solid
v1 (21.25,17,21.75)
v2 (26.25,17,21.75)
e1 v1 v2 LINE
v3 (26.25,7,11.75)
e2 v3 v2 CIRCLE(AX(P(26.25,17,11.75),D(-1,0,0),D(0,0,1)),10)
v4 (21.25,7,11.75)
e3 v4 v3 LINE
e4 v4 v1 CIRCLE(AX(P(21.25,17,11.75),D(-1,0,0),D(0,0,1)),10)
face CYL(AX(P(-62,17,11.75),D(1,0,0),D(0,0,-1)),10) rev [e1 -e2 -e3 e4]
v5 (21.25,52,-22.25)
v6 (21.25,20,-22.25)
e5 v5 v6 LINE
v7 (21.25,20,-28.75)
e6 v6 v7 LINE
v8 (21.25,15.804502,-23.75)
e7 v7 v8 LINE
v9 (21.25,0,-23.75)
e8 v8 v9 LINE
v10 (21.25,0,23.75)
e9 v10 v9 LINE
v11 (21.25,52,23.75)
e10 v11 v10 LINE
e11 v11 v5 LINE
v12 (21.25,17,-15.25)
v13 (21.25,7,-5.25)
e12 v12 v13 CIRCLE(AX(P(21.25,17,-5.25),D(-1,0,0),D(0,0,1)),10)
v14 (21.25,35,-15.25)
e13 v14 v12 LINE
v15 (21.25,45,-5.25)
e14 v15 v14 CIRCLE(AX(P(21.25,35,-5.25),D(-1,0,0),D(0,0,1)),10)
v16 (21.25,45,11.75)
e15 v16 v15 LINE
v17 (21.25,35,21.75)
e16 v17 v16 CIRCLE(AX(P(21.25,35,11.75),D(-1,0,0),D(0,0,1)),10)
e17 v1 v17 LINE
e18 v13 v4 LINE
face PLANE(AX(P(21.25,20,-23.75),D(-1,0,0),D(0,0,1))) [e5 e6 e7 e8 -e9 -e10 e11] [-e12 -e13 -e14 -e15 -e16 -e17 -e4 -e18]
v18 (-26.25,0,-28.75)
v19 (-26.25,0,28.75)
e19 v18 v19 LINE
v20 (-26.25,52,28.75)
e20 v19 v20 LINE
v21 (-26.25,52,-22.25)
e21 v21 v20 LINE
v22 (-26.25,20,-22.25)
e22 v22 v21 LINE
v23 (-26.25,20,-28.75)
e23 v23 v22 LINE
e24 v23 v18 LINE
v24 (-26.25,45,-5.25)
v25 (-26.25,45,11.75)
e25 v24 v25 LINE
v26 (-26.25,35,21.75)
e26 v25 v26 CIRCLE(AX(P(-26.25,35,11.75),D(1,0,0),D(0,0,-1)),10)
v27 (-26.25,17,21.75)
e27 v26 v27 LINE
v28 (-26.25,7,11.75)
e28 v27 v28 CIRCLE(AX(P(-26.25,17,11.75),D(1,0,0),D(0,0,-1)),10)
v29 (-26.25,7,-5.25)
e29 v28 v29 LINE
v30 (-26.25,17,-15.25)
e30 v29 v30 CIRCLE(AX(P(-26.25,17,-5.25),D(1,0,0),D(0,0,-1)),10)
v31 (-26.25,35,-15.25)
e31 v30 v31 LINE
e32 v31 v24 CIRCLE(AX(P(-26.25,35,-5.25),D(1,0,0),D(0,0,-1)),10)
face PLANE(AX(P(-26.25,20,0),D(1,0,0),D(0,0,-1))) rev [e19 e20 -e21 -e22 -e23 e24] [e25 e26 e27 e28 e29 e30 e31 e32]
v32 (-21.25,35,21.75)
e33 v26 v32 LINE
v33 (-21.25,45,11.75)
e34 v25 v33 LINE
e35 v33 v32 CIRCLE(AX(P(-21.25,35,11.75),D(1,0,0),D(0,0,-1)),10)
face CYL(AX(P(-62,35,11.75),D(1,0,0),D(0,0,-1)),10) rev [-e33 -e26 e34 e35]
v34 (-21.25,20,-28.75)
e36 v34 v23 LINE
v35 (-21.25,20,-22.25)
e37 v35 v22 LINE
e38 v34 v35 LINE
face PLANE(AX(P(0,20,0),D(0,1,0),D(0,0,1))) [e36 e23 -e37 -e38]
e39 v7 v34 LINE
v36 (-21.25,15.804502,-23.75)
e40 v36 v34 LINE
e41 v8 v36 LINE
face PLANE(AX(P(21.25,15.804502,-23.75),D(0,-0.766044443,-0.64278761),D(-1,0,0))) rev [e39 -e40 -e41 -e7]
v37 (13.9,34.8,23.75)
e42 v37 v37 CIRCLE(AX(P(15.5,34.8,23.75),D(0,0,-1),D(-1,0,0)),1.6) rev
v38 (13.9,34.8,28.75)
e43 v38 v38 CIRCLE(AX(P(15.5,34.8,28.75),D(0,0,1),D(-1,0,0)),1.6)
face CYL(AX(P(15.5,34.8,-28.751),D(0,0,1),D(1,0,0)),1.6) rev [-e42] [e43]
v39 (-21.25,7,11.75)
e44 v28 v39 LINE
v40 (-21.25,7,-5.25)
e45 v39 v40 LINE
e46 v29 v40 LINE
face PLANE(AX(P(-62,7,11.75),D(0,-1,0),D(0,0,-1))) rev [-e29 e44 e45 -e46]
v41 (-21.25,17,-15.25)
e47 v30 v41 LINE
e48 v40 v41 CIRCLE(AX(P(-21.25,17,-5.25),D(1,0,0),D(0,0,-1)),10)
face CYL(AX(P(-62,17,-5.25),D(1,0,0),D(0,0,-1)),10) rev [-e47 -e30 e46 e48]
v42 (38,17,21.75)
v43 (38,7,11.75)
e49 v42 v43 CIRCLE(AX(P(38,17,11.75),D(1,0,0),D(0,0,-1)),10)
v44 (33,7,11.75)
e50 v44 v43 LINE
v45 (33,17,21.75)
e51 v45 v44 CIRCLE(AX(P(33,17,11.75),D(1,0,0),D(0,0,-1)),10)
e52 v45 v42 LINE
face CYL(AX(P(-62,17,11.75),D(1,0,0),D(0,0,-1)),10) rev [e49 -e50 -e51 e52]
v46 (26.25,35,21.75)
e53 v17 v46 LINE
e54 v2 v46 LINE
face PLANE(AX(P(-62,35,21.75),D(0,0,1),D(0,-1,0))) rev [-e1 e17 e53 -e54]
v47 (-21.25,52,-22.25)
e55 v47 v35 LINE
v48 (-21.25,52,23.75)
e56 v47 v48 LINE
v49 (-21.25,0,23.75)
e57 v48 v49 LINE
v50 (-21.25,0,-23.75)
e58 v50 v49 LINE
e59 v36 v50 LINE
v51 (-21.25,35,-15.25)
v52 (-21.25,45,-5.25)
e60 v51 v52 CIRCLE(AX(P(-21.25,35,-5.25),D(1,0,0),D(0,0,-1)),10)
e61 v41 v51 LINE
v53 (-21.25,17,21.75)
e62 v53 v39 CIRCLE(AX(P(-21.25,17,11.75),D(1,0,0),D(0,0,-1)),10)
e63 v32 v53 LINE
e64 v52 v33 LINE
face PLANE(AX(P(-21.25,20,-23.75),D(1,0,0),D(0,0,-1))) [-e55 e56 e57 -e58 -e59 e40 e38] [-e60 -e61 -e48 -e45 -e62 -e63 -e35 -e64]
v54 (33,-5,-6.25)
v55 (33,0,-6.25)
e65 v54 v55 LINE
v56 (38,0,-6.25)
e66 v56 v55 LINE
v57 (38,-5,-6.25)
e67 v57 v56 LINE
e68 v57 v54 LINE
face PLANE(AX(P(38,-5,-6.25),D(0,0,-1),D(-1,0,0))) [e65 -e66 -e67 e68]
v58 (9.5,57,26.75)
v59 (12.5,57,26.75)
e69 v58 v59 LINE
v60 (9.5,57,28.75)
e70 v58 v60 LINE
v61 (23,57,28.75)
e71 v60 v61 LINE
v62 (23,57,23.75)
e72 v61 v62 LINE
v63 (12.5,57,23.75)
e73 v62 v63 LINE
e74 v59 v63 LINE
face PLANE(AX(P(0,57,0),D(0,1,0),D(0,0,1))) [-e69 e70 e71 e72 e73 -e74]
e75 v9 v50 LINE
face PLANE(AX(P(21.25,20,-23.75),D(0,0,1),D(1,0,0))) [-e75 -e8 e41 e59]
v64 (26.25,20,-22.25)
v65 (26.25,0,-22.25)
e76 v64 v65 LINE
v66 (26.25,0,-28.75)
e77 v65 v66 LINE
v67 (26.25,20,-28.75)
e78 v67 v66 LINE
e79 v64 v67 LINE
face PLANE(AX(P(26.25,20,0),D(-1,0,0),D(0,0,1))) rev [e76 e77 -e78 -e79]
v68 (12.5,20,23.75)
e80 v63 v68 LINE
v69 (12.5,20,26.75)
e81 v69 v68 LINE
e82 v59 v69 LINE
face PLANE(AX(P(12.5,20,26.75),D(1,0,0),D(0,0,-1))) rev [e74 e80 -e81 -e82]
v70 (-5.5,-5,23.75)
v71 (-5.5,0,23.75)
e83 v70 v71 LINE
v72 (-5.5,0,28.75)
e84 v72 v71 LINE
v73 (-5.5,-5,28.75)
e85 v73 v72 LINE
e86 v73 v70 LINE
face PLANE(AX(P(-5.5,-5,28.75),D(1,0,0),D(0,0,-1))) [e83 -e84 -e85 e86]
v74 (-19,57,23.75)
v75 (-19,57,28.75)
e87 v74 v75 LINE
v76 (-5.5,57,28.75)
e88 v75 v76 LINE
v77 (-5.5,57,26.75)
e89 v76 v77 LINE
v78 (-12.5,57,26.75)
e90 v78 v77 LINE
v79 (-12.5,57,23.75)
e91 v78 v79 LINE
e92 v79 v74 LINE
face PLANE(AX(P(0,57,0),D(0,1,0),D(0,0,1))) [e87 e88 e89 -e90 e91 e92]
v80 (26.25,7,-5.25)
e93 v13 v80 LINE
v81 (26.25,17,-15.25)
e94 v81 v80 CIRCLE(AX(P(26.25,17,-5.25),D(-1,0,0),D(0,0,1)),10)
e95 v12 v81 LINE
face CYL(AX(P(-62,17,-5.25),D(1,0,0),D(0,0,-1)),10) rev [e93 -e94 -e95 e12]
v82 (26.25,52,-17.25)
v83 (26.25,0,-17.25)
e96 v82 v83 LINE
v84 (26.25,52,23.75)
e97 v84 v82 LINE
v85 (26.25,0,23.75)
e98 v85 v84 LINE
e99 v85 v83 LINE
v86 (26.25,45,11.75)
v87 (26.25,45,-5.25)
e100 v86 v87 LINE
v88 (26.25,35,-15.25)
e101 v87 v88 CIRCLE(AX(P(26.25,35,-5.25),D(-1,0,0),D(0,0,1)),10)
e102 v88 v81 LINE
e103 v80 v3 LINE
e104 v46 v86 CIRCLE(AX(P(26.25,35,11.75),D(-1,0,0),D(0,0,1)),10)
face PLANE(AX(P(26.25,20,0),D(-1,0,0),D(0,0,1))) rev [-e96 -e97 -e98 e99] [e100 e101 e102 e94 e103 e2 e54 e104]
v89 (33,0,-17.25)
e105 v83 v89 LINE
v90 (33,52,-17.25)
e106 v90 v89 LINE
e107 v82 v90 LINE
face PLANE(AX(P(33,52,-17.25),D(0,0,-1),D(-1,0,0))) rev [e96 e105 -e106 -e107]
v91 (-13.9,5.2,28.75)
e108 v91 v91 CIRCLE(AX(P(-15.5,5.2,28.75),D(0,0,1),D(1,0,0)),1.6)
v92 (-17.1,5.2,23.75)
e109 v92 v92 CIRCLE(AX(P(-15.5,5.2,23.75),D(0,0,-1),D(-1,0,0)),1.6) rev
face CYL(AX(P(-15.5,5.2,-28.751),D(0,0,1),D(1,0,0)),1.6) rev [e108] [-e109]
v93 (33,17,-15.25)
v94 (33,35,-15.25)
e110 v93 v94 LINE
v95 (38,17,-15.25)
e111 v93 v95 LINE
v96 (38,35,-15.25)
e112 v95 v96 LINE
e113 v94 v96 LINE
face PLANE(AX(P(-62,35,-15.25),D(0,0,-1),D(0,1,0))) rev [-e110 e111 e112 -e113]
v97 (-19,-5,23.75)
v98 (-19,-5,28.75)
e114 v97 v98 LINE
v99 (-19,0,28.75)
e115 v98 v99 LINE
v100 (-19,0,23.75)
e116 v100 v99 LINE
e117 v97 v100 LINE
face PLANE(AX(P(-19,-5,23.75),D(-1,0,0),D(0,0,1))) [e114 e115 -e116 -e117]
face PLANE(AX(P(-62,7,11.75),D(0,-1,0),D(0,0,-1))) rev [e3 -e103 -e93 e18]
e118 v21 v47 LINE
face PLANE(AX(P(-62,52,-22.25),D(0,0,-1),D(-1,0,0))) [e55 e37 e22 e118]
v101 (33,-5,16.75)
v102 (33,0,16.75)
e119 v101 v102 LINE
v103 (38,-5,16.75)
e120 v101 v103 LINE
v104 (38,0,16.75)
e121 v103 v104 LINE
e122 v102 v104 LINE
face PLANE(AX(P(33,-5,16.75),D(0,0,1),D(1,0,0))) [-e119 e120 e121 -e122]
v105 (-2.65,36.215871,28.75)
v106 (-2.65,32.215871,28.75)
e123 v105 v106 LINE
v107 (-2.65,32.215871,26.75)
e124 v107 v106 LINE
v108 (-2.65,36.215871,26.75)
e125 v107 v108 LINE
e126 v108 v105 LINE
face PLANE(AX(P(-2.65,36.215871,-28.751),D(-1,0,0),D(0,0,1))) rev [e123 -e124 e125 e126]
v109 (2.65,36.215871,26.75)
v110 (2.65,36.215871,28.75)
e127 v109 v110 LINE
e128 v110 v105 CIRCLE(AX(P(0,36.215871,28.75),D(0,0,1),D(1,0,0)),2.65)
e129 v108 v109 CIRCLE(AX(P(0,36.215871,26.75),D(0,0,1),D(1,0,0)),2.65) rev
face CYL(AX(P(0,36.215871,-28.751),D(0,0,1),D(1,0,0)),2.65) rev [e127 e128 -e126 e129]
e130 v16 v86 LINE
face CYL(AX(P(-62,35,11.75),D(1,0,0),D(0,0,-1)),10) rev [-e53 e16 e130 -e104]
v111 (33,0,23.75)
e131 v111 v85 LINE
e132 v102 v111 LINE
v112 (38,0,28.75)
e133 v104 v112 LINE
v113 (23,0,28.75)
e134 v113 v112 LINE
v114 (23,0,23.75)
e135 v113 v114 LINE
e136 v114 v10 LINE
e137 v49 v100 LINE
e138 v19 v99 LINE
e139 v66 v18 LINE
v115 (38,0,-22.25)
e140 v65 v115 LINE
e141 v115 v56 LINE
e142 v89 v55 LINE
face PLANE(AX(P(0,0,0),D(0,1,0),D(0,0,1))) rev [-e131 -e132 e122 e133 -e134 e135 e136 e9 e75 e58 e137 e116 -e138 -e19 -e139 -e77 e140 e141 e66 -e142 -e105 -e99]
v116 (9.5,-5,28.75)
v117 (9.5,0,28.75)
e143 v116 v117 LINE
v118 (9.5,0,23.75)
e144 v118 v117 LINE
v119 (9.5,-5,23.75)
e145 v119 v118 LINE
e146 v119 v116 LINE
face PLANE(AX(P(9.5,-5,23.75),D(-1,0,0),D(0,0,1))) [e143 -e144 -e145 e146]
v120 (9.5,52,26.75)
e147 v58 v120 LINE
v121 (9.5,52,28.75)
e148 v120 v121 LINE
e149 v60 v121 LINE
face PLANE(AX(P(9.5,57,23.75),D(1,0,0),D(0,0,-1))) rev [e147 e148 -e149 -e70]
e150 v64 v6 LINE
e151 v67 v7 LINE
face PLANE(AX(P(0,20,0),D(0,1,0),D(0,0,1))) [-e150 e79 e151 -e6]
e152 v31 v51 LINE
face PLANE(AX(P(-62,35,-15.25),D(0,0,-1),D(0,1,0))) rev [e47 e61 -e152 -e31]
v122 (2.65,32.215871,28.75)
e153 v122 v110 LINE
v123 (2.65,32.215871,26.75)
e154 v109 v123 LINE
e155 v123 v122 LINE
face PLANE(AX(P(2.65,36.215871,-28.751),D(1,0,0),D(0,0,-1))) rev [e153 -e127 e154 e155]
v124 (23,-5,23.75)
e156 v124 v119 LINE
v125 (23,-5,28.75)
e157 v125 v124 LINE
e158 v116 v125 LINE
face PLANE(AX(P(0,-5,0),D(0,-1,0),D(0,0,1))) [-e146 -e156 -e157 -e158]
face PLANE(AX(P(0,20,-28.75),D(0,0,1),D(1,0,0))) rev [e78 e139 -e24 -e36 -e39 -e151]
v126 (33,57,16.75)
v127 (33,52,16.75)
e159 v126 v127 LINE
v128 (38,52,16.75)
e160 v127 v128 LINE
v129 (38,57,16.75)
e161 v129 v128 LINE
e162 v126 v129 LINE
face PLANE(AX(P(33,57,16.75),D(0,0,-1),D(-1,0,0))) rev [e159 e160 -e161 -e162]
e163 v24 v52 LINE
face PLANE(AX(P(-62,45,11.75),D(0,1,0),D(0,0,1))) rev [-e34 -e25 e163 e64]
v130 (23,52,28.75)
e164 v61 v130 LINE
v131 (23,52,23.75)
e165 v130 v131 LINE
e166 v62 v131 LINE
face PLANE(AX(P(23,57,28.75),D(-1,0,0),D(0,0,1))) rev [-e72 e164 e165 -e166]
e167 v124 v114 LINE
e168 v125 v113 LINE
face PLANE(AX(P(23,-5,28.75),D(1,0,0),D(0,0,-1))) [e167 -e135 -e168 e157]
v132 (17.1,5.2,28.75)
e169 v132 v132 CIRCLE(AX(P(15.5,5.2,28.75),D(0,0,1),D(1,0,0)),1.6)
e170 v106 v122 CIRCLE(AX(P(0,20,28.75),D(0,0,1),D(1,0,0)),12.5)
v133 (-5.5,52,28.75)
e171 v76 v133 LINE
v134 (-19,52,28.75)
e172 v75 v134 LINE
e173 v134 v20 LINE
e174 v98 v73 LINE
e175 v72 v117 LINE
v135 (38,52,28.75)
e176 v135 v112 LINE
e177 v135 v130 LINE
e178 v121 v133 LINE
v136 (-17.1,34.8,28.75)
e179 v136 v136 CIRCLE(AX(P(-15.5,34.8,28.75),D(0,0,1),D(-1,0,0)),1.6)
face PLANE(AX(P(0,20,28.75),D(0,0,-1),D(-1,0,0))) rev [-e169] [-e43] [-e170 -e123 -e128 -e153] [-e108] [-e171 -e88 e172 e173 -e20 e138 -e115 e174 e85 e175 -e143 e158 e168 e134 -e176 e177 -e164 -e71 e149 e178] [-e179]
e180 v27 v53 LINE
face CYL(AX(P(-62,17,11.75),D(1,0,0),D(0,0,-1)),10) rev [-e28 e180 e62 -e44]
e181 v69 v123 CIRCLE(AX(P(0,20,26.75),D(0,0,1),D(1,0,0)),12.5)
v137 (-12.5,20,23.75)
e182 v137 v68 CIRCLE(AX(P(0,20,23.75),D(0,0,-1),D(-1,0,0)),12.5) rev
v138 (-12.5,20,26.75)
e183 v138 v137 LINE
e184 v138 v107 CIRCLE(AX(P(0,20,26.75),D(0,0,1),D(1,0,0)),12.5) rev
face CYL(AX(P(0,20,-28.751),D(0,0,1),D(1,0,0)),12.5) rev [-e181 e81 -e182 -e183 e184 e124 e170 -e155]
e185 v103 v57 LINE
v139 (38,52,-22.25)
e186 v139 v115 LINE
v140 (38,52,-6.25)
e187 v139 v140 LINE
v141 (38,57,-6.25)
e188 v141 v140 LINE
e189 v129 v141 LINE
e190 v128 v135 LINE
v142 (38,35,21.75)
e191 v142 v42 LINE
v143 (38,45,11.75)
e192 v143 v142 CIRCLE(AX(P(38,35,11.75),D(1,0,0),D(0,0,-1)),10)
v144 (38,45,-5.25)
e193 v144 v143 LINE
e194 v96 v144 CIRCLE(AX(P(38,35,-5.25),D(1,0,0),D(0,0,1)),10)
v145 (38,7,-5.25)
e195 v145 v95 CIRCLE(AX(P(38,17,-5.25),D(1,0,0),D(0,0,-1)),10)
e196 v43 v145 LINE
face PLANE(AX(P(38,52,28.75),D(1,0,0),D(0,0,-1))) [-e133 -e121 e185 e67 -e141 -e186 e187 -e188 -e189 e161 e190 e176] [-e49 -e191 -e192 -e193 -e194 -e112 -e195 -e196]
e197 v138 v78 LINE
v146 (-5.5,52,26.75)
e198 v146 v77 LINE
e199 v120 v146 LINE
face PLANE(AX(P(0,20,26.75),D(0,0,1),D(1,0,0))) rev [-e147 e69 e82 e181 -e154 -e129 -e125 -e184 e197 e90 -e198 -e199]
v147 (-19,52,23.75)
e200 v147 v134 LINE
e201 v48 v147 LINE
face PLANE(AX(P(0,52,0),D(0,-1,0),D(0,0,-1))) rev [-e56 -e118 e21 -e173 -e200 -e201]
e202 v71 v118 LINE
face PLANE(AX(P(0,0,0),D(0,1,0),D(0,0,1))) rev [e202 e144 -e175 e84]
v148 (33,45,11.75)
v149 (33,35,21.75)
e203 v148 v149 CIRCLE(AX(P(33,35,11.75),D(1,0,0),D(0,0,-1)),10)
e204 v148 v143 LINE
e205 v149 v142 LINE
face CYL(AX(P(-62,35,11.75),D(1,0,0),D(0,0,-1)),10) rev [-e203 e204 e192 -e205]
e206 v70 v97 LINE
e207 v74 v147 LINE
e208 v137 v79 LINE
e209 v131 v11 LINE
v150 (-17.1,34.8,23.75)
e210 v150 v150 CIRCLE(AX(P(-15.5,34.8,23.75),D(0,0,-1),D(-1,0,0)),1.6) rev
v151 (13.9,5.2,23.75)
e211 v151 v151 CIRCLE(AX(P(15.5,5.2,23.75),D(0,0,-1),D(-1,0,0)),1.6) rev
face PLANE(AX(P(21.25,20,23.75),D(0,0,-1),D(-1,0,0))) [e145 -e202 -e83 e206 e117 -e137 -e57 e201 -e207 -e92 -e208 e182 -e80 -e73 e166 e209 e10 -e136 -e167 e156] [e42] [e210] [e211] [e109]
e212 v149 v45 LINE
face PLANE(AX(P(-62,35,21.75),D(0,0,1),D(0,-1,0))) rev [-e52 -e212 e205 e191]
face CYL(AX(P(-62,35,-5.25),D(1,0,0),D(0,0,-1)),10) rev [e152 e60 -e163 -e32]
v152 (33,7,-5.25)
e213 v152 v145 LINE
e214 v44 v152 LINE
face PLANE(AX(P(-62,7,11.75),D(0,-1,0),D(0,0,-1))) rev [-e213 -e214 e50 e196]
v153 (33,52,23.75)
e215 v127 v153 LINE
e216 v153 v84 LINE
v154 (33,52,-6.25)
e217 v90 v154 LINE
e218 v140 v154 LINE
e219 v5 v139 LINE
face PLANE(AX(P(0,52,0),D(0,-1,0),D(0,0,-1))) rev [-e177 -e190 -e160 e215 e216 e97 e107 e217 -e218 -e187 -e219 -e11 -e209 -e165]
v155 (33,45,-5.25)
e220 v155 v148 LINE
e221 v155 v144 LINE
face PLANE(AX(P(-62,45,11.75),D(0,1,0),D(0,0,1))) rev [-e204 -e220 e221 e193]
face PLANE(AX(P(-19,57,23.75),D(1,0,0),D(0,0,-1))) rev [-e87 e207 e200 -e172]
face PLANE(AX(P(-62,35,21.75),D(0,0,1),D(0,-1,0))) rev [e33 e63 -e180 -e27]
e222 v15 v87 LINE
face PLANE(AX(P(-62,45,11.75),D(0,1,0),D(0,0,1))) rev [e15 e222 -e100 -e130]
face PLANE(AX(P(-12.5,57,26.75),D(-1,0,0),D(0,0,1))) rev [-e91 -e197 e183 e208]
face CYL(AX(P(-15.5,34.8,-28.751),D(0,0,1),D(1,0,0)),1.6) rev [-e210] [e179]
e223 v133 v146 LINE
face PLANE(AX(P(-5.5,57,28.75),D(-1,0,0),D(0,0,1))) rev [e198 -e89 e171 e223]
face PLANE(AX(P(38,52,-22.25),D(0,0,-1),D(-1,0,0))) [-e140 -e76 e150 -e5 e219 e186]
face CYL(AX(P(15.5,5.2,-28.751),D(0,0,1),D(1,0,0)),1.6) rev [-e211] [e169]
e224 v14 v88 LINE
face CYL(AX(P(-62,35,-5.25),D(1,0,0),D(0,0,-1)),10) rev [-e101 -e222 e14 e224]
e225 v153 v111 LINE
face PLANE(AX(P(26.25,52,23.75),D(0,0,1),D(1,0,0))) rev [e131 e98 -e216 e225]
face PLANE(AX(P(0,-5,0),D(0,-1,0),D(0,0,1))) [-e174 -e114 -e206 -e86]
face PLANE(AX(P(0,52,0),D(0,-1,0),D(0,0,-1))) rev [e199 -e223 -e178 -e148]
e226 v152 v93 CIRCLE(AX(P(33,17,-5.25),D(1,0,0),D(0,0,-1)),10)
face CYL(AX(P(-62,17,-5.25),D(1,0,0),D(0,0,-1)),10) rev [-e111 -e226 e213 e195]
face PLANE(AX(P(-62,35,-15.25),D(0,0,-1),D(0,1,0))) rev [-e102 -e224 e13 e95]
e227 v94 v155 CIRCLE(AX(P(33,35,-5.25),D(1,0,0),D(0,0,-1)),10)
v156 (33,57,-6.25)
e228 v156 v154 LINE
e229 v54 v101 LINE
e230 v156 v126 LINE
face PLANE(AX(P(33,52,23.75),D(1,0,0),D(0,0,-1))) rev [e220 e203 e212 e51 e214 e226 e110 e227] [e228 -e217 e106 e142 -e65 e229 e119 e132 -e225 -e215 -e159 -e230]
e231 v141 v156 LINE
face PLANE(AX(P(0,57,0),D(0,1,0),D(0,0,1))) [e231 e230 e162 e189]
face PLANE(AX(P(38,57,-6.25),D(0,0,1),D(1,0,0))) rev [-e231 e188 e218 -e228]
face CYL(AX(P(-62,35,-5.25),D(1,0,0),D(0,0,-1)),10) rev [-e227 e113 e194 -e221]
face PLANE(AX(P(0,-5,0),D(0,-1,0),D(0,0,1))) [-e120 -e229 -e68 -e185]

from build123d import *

# Parameters (mm, degrees)
ESQUISSE1_W                  = 52.5
ESQUISSE1_H                  = 57.5
ESQUISSE1_W_2                = 42.5
ESQUISSE1_H_2                = 47.5
EXTRU_MINCE1_DEPTH           = 20
ESQUISSE3_W                  = 6.75
ESQUISSE3_H                  = 41
ESQUISSE3_W_2                = 30.75
BOSS_EXTRU_1_DEPTH           = 52
ESQUISSE6_W                  = 5
ESQUISSE6_H                  = 23
ESQUISSE6_W_2                = 13.5
ESQUISSE6_H_2                = 5
BOSS_EXTRU_3_DEPTH           = 5
ENL_V_MAT_EXTRU_1_REACH      = 103.977
ESQUISSE2_R                  = 1.6
ENL_V_START                  = -3
ENL_V_MAT_EXTRU_2_DEPTH      = 3
ENL_V_MAT_EXTRU_3_DEPTH      = 119.640475808
ENL_V_MAT_EXTRU_4_DEPTH      = 99.458112921
ENL_V_MAT_EXTRU_5_DEPTH      = 89.991923791
ENL_V_MAT_EXTRU_5_DEPTH_BACK = 89.991923791
ESQUISSE10_W                 = 35.75
ESQUISSE10_H                 = 51
CHANFREIN1_SIZE2             = 4.195498156
CHANFREIN1_SIZE              = 5


with BuildPart() as part:
    # Esquisse1 → Extru.-Mince1 (new body)
    with BuildSketch(Plane(origin=(0, 0, 0), x_dir=(1, 0, 0), z_dir=(0, 1, 0))):
        Rectangle(ESQUISSE1_W, ESQUISSE1_H)
        Rectangle(ESQUISSE1_W_2, ESQUISSE1_H_2, mode=Mode.SUBTRACT)
    extrude(amount=EXTRU_MINCE1_DEPTH)

    # Esquisse3 → Boss.-Extru.1 (add)
    with BuildSketch(Plane.XZ):
        Polygon((26.25, 28.75), (38, 28.75), (38, -22.25), (21.25, -22.25), (21.25, 23.75), (-21.25, 23.75), (-21.25, -22.25), (-62, -22.25), (-62, 28.75), (-26.25, 28.75), (0, 28.75), align=None)
        with Locations((29.625, 3.25)):
            Rectangle(ESQUISSE3_W, ESQUISSE3_H, mode=Mode.SUBTRACT)
        with Locations((-41.625, 3.25)):
            Rectangle(ESQUISSE3_W_2, ESQUISSE3_H, mode=Mode.SUBTRACT)
    extrude(amount=-BOSS_EXTRU_1_DEPTH)

    # Esquisse6 → Boss.-Extru.3 (add)
    with BuildSketch(Plane(origin=(0, 52, 0), x_dir=(1, 0, 0), z_dir=(0, 1, 0))):
        with Locations((35.5, -5.25)):
            Rectangle(ESQUISSE6_W, ESQUISSE6_H)
        with Locations((16.25, -26.25)):
            Rectangle(ESQUISSE6_W_2, ESQUISSE6_H_2)
        with Locations((-12.25, -26.25)):
            Rectangle(ESQUISSE6_W_2, ESQUISSE6_H_2)
        with Locations((-40.75, -26.25)):
            Rectangle(ESQUISSE6_W_2, ESQUISSE6_H_2)
        with Locations((-40.75, 19.75)):
            Rectangle(ESQUISSE6_W_2, ESQUISSE6_H_2)
        with Locations((-59.5, -5.25)):
            Rectangle(ESQUISSE6_W, ESQUISSE6_H)
    boss_extru_3 = extrude(amount=BOSS_EXTRU_3_DEPTH)

    # Esquisse2 → Enlèv. mat.-Extru.1 (cut, up to next)
    with BuildSketch(Plane.XY.offset(28.75), mode=Mode.PRIVATE) as enl_v_mat_extru_1_sk1:
        with Locations((-15.5, 5.2)):
            Circle(ESQUISSE2_R)
    enl_v_mat_extru_1_tool1 = extrude(enl_v_mat_extru_1_sk1.sketch, amount=-ENL_V_MAT_EXTRU_1_REACH, mode=Mode.PRIVATE) & part.part
    # Esquisse2 → Enlèv. mat.-Extru.1 (cut, up to next)
    with BuildSketch(Plane.XY.offset(28.75), mode=Mode.PRIVATE) as enl_v_mat_extru_1_sk2:
        with Locations((15.5, 5.2)):
            Circle(ESQUISSE2_R)
    enl_v_mat_extru_1_tool2 = extrude(enl_v_mat_extru_1_sk2.sketch, amount=-ENL_V_MAT_EXTRU_1_REACH, mode=Mode.PRIVATE) & part.part
    # Esquisse2 → Enlèv. mat.-Extru.1 (cut, up to next)
    with BuildSketch(Plane.XY.offset(28.75), mode=Mode.PRIVATE) as enl_v_mat_extru_1_sk3:
        with Locations(Location((15.5, 34.8, 0), (0, 0, 180))):
            Circle(ESQUISSE2_R)
    enl_v_mat_extru_1_tool3 = extrude(enl_v_mat_extru_1_sk3.sketch, amount=-ENL_V_MAT_EXTRU_1_REACH, mode=Mode.PRIVATE) & part.part
    # Esquisse2 → Enlèv. mat.-Extru.1 (cut, up to next)
    with BuildSketch(Plane.XY.offset(28.75), mode=Mode.PRIVATE) as enl_v_mat_extru_1_sk4:
        with Locations(Location((-15.5, 34.8, 0), (0, 0, 180))):
            Circle(ESQUISSE2_R)
    enl_v_mat_extru_1_tool4 = extrude(enl_v_mat_extru_1_sk4.sketch, amount=-ENL_V_MAT_EXTRU_1_REACH, mode=Mode.PRIVATE) & part.part
    # Esquisse2 → Enlèv. mat.-Extru.1 (cut, up to next)
    with BuildSketch(Plane.XY.offset(28.75), mode=Mode.PRIVATE) as enl_v_mat_extru_1_sk5:
        with BuildLine():
            Line((2.65, 36.215870824), (2.65, 32.215870824))
            ThreePointArc((2.65, 32.215870824), (0, 7.5), (-2.65, 32.215870824))
            Line((-2.65, 32.215870824), (-2.65, 36.215870824))
            ThreePointArc((-2.65, 36.215870824), (0, 38.865870824), (2.65, 36.215870824))
        make_face()
    enl_v_mat_extru_1_tool5 = extrude(enl_v_mat_extru_1_sk5.sketch, amount=-ENL_V_MAT_EXTRU_1_REACH, mode=Mode.PRIVATE) & part.part
    add(enl_v_mat_extru_1_tool1.solids().sort_by_distance((-15.5, 5.2, 28.75))[0], mode=Mode.SUBTRACT)
    add(enl_v_mat_extru_1_tool2.solids().sort_by_distance((15.5, 5.2, 28.75))[0], mode=Mode.SUBTRACT)
    add(enl_v_mat_extru_1_tool3.solids().sort_by_distance((15.5, 34.8, 28.75))[0], mode=Mode.SUBTRACT)
    add(enl_v_mat_extru_1_tool4.solids().sort_by_distance((-15.5, 34.8, 28.75))[0], mode=Mode.SUBTRACT)
    add(enl_v_mat_extru_1_tool5.solids().sort_by_distance((0, 20.91985, 28.75))[0], mode=Mode.SUBTRACT)

    # Esquisse4 → Enlèv. mat.-Extru.2 (cut)
    with BuildSketch(Plane(origin=(0, 0, 23.75), x_dir=(-1, 0, 0), z_dir=(0, 0, -1)).offset(ENL_V_START)):
        with BuildLine():
            Line((-12.5, 20), (-12.5, 57))
            Line((-12.5, 57), (12.5, 57))
            Line((12.5, 57), (12.5, 20))
            ThreePointArc((12.5, 20), (0, 32.5), (-12.5, 20))
        make_face()
    extrude(amount=ENL_V_MAT_EXTRU_2_DEPTH, mode=Mode.SUBTRACT)

    # Symétrie1: Boss.-Extru.3 across plane
    add(boss_extru_3.mirror(Plane(origin=(0, 26, 0), x_dir=(0, 0, 1), z_dir=(0, -1, 0))))

    # Esquisse7 → Enlèv. mat.-Extru.3 (cut, through all)
    with BuildSketch(Plane(origin=(38, 0, 0), x_dir=(0, 0, -1), z_dir=(1, 0, 0))):
        with BuildLine():
            Line((-11.75, 45), (5.25, 45))
            ThreePointArc((5.25, 45), (12.321067812, 42.071067812), (15.25, 35))
            Line((15.25, 35), (15.25, 17))
            ThreePointArc((15.25, 17), (12.321067812, 9.928932188), (5.25, 7))
            Line((5.25, 7), (-11.75, 7))
            ThreePointArc((-11.75, 7), (-18.821067812, 9.928932188), (-21.75, 17))
            Line((-21.75, 17), (-21.75, 35))
            ThreePointArc((-21.75, 35), (-18.821067812, 42.071067812), (-11.75, 45))
        make_face()
    extrude(amount=-ENL_V_MAT_EXTRU_3_DEPTH, mode=Mode.SUBTRACT)

    # Esquisse8 → Enlèv. mat.-Extru.4 (cut, through all)
    with BuildSketch(Plane(origin=(0, 0, -22.25), x_dir=(-1, 0, 0), z_dir=(0, 0, -1))):
        with BuildLine():
            Line((48.625, 33.5), (48.625, 18.5))
            ThreePointArc((48.625, 18.5), (41.625, 11.5), (34.625, 18.5))
            Line((34.625, 18.5), (34.625, 33.5))
            ThreePointArc((34.625, 33.5), (41.625, 40.5), (48.625, 33.5))
        make_face()
    extrude(amount=-ENL_V_MAT_EXTRU_4_DEPTH, mode=Mode.SUBTRACT)

    # Esquisse10 → Enlèv. mat.-Extru.5 (cut, two sides: drawn at the far end of the back side and taken through both)
    with BuildSketch(Plane(origin=(0, 52, 0), x_dir=(1, 0, 0), z_dir=(0, 1, 0)).offset(-ENL_V_MAT_EXTRU_5_DEPTH_BACK)):
        with Locations((-44.125, -3.25)):
            Rectangle(ESQUISSE10_W, ESQUISSE10_H)
    extrude(amount=ENL_V_MAT_EXTRU_5_DEPTH + ENL_V_MAT_EXTRU_5_DEPTH_BACK, mode=Mode.SUBTRACT)

    # Chanfrein1
    chanfrein1_edges = [part.edges().sort_by_distance(p)[0] for p in [
        (0, 20, -23.75),
    ]]
    chanfrein1_side = [part.faces().sort_by_distance(p)[0] for p in [
        (0, 20, -23.833909963),
    ]]
    chamfer(chanfrein1_edges, length=CHANFREIN1_SIZE - 0.0001, length2=CHANFREIN1_SIZE2 - 0.0001, reference=chanfrein1_side[0])  # a hair under: the kernel refuses the full size


solid = part.part
